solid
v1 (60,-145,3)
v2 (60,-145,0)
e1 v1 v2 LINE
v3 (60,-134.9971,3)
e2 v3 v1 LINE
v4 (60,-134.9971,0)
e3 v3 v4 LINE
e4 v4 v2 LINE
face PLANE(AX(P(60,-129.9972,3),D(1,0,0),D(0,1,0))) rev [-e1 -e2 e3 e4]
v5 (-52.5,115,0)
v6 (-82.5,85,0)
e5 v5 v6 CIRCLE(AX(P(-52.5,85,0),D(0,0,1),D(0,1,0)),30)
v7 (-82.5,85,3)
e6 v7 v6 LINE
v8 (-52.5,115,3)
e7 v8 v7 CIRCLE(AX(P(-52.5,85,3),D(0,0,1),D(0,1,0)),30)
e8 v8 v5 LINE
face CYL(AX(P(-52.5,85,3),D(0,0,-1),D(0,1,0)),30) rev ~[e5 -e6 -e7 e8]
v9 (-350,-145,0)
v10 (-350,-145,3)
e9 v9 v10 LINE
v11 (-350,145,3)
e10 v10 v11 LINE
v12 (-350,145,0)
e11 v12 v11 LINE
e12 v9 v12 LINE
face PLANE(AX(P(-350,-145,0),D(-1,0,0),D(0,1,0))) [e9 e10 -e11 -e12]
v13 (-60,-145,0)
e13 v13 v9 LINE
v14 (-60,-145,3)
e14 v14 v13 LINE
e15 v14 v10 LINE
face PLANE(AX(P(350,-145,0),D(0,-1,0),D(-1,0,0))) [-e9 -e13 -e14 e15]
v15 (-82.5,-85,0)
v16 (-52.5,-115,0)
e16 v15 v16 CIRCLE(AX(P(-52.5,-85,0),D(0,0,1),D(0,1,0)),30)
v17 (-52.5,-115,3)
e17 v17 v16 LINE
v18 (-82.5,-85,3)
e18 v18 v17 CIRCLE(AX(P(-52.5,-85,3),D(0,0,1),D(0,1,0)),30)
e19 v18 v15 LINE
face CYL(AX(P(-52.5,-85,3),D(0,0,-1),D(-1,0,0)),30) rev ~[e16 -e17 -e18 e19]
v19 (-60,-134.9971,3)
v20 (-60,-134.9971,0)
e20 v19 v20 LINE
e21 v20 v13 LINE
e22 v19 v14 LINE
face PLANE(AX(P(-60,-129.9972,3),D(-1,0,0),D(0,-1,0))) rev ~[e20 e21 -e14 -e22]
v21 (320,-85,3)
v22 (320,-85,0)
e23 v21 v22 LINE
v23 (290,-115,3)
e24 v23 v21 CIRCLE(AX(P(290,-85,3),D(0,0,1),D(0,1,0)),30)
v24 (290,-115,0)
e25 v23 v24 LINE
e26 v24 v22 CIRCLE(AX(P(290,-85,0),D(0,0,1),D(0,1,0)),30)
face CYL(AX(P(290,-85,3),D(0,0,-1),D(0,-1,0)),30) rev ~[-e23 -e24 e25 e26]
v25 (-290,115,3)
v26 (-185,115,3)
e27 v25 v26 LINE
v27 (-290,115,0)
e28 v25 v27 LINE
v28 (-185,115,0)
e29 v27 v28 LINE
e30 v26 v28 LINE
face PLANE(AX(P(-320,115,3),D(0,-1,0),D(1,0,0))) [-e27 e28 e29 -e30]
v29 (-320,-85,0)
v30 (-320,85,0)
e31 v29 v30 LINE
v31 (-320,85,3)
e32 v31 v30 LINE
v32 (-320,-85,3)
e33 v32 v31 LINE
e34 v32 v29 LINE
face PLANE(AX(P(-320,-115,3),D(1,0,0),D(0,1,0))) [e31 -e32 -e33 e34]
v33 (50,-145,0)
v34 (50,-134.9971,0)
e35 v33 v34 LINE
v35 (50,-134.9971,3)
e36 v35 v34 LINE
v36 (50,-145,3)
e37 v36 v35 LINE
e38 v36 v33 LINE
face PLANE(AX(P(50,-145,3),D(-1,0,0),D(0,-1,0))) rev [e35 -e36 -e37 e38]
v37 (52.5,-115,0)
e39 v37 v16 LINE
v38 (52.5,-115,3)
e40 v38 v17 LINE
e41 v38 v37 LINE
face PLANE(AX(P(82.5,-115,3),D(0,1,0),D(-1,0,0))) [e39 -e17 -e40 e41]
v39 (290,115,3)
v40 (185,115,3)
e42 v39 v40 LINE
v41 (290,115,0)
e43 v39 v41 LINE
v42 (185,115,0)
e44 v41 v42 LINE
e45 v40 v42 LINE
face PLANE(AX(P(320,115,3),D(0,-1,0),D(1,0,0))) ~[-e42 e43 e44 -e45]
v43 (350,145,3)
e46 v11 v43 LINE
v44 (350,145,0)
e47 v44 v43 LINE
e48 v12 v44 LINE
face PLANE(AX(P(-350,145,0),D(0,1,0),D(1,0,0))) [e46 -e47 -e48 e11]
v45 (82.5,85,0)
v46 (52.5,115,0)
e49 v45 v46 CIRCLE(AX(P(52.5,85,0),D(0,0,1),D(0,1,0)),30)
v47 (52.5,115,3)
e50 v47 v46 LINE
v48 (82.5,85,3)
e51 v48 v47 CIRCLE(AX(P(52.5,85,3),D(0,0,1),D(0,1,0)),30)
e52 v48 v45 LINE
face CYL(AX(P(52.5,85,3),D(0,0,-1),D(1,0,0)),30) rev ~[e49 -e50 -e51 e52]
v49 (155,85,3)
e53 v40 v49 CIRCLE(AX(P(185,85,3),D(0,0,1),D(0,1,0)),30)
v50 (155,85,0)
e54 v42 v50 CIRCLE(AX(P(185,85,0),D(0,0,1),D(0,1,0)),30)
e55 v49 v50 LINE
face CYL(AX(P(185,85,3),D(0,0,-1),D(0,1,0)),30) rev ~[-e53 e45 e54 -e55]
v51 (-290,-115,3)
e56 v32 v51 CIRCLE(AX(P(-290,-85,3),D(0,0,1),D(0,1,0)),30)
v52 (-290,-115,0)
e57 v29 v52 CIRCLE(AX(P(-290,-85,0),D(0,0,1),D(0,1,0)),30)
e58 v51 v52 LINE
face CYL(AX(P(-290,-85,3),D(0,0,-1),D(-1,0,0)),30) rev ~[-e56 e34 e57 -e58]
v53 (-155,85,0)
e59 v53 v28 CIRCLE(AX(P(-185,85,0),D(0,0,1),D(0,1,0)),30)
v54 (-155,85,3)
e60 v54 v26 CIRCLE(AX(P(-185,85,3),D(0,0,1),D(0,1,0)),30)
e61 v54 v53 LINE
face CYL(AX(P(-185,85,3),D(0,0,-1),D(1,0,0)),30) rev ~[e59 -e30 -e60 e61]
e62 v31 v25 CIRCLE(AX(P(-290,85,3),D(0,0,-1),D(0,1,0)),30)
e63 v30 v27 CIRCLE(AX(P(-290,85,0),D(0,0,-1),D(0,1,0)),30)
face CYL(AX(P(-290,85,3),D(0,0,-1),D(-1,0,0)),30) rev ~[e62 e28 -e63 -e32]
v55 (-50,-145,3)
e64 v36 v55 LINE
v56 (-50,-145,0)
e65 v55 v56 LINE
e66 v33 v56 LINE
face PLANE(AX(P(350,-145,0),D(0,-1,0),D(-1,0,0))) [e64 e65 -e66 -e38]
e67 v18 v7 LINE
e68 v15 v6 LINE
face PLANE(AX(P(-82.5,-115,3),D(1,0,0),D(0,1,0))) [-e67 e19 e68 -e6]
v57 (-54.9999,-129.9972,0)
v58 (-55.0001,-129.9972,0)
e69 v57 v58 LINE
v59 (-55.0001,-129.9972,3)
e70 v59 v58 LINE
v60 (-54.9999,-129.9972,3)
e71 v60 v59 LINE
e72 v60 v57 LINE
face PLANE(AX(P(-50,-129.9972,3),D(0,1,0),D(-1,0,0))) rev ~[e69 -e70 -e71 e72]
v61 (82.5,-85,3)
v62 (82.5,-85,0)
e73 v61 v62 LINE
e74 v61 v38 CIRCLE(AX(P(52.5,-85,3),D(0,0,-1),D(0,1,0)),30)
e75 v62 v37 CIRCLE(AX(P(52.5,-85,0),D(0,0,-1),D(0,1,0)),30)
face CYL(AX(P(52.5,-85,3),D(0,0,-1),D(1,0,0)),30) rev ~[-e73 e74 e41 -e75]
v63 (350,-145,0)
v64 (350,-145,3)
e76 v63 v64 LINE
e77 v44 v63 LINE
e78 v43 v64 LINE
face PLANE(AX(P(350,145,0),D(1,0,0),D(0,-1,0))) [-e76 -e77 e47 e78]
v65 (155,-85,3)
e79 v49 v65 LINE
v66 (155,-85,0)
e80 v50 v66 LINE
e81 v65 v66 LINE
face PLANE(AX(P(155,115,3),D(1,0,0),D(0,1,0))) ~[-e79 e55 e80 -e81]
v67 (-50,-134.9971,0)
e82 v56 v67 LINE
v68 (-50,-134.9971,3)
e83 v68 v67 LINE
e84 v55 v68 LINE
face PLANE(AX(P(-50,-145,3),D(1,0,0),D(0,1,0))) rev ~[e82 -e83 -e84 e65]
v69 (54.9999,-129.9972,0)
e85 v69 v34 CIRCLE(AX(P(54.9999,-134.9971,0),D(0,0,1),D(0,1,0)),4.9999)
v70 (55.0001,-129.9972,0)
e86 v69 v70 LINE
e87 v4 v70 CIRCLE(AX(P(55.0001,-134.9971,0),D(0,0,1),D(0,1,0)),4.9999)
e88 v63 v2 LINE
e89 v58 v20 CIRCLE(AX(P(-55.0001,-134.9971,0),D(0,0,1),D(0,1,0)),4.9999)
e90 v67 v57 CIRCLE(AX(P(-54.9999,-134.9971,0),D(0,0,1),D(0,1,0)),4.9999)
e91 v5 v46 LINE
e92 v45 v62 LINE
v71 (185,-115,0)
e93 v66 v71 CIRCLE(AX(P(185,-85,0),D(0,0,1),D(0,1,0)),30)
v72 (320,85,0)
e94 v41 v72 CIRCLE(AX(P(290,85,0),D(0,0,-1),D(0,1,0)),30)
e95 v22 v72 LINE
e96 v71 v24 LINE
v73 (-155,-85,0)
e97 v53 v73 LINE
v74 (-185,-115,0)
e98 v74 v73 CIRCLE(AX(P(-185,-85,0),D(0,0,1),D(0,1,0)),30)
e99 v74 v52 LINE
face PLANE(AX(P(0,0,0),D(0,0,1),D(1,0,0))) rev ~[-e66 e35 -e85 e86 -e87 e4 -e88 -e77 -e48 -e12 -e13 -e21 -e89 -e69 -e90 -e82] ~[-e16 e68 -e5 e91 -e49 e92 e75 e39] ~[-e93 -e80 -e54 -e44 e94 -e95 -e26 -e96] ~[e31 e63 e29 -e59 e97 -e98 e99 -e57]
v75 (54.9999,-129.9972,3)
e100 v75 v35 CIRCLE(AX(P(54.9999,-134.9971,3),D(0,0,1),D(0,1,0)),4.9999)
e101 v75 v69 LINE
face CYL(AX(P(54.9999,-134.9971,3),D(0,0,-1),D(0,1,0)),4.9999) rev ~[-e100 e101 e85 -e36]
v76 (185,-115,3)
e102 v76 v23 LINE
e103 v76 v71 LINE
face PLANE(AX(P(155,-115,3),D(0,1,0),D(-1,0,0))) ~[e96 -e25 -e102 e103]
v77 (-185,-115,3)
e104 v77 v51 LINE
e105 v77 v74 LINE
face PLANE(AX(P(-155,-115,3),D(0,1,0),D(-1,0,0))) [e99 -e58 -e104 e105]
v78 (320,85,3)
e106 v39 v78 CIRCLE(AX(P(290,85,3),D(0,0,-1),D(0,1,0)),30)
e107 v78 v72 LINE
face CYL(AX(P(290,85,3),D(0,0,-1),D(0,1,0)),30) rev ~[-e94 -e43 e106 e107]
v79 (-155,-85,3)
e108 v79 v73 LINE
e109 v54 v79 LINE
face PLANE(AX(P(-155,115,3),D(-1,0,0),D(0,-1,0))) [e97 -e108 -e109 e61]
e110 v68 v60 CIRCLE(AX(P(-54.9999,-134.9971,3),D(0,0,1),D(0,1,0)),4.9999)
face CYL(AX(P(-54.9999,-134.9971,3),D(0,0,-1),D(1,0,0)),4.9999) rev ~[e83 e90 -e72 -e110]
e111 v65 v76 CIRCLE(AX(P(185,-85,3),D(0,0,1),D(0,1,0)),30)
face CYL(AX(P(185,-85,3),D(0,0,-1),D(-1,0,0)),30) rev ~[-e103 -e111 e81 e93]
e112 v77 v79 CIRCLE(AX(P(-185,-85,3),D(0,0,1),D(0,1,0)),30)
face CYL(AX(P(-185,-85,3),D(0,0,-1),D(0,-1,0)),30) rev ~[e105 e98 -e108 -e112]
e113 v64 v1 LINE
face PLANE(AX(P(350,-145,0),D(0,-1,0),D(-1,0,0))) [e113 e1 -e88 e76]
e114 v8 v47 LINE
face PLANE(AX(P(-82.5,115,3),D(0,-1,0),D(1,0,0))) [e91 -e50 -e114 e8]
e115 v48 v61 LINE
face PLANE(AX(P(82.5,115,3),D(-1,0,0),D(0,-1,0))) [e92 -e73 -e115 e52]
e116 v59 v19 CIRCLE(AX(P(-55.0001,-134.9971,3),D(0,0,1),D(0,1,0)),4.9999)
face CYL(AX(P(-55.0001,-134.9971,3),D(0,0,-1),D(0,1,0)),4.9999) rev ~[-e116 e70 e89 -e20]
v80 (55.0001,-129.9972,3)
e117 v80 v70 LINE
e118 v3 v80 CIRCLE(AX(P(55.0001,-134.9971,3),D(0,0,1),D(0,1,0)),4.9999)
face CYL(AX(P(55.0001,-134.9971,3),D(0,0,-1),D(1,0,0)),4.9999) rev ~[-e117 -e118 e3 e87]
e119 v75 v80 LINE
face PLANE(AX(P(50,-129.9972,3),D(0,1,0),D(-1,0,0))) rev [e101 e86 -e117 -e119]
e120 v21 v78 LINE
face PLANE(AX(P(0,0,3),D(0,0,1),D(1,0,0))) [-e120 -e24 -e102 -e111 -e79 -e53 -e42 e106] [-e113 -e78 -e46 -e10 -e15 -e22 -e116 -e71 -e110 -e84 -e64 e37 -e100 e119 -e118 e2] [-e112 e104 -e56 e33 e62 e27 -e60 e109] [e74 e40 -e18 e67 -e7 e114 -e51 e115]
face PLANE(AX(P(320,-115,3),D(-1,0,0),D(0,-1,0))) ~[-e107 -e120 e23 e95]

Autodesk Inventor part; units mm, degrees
ref_plane "YZ Plane" through (0, 0, 0) normal (1, 0, 0) x (0, 1, 0)
ref_plane "XZ Plane" through (0, 0, 0) normal (0, 1, 0) x (-1, 0, 0)
ref_plane "XY Plane" through (0, 0, 0) normal (0, 0, 1) x (1, 0, 0)
sketch "Sketch1" plane through (0, 0, 0) normal (0, 0, 1) x (1, 0, 0)
  line L0 (350, -145) -> (-350, -145)
  line L1 (-350, -145) -> (-350, 145)
  line L2 (-350, 145) -> (350, 145)
  line L3 (350, 145) -> (350, -145)
  line L4 (350, -145) -> (-350, 145) construction
  line L5 (-350, -145) -> (350, 145) construction
  point P0 (0, 0)
  dimension "d0" = 290
  dimension "d1" = 700
extrude "Extrusion1" add sketch "Sketch1" along normal blind 3
sketch "Sketch2" plane through (0, 0, 3) normal (0, 0, 1) x (1, 0, 0)
  line L0 (-320, 115) -> (-155, 115)
  line L1 (-155, 115) -> (-155, -115)
  line L2 (-155, -115) -> (-320, -115)
  line L3 (-320, -115) -> (-320, 115)
  line L4 (-350, 145) -> (-350, -145) projected
  line L5 (350, 145) -> (-350, 145) projected
  line L6 (-350, -145) -> (350, -145) projected
  point P0 (0, 0)
  dimension "d4" = 30
  dimension "d5" = 30
  dimension "d6" = 30
  dimension "d7" = 165
extrude "Extrusion2" cut sketch "Sketch2" against normal blind 3
fillet "Fillet1" radius 30 4 edges at (-320, 115, 1.5) (-155, 115, 1.5) (-320, -115, 1.5) (-155, -115, 1.5)
mirror "Mirror1" about plane through (0, 0, 0) normal (1, 0, 0) of "Extrusion2", "Fillet1"
sketch "Sketch3" plane through (0, 0, 3) normal (0, 0, 1) x (1, 0, 0)
  line L0 (-290, 115) -> (-185, 115) projected
  line L1 (-155, 85) -> (-155, -85) projected
  line L2 (-185, -115) -> (-290, -115) projected
  line L3 (350, 145) -> (-350, 145) projected
  line L4 (-350, -145) -> (350, -145) projected
  line L5 (-350, 145) -> (-350, -145) projected
  line L6 (350, -145) -> (350, 145) projected
  line L7 (82.5, -115) -> (-82.5, -115)
  line L8 (-82.5, -115) -> (-82.5, 115)
  line L9 (-82.5, 115) -> (82.5, 115)
  line L10 (82.5, 115) -> (82.5, -115)
  line L11 (82.5, -115) -> (-82.5, 115) construction
  line L12 (-82.5, -115) -> (82.5, 115) construction
  line L13 (-320, -85) -> (-320, 85) projected
  point P0 (0, 0)
  dimension "d11" = 165
  dimension "d12" = 165
extrude "Extrusion3" cut sketch "Sketch3" against normal blind 3 contours L7 L8 L9 L10
fillet "Fillet2" radius 30 4 edges at (82.5, 115, 1.5) (-82.5, 115, 1.5) (-82.5, -115, 1.5) (82.5, -115, 1.5)
sketch "Sketch4" plane through (0, 0, 3) normal (0, 0, 1) x (1, 0, 0)
  line L0 (-350, 145) -> (-350, -145) projected
  line L1 (-350, -145) -> (350, -145) projected
  line L2 (-60, -145) -> (-50, -145)
  line L3 (-50, -145) -> (-50, -129.9972)
  line L4 (-50, -129.9972) -> (-60, -129.9972)
  line L5 (-60, -129.9972) -> (-60, -145)
  point P0 (0, 0)
  dimension "d16" = 290
  dimension "d17" = 10
extrude "Extrusion4" cut sketch "Sketch4" against normal blind 3
fillet "Fillet3" radius 5 2 edges at (-60, -129.9972, 1.5) (-50, -129.9972, 1.5)
mirror "Mirror2" about plane through (0, 0, 0) normal (1, 0, 0) of "Extrusion4", "Fillet3"
equation "\"d12\" = d11"
equation "\"d20\" = 0.5 * d17"
properties part number "GBX_020.1-front-MDF"
